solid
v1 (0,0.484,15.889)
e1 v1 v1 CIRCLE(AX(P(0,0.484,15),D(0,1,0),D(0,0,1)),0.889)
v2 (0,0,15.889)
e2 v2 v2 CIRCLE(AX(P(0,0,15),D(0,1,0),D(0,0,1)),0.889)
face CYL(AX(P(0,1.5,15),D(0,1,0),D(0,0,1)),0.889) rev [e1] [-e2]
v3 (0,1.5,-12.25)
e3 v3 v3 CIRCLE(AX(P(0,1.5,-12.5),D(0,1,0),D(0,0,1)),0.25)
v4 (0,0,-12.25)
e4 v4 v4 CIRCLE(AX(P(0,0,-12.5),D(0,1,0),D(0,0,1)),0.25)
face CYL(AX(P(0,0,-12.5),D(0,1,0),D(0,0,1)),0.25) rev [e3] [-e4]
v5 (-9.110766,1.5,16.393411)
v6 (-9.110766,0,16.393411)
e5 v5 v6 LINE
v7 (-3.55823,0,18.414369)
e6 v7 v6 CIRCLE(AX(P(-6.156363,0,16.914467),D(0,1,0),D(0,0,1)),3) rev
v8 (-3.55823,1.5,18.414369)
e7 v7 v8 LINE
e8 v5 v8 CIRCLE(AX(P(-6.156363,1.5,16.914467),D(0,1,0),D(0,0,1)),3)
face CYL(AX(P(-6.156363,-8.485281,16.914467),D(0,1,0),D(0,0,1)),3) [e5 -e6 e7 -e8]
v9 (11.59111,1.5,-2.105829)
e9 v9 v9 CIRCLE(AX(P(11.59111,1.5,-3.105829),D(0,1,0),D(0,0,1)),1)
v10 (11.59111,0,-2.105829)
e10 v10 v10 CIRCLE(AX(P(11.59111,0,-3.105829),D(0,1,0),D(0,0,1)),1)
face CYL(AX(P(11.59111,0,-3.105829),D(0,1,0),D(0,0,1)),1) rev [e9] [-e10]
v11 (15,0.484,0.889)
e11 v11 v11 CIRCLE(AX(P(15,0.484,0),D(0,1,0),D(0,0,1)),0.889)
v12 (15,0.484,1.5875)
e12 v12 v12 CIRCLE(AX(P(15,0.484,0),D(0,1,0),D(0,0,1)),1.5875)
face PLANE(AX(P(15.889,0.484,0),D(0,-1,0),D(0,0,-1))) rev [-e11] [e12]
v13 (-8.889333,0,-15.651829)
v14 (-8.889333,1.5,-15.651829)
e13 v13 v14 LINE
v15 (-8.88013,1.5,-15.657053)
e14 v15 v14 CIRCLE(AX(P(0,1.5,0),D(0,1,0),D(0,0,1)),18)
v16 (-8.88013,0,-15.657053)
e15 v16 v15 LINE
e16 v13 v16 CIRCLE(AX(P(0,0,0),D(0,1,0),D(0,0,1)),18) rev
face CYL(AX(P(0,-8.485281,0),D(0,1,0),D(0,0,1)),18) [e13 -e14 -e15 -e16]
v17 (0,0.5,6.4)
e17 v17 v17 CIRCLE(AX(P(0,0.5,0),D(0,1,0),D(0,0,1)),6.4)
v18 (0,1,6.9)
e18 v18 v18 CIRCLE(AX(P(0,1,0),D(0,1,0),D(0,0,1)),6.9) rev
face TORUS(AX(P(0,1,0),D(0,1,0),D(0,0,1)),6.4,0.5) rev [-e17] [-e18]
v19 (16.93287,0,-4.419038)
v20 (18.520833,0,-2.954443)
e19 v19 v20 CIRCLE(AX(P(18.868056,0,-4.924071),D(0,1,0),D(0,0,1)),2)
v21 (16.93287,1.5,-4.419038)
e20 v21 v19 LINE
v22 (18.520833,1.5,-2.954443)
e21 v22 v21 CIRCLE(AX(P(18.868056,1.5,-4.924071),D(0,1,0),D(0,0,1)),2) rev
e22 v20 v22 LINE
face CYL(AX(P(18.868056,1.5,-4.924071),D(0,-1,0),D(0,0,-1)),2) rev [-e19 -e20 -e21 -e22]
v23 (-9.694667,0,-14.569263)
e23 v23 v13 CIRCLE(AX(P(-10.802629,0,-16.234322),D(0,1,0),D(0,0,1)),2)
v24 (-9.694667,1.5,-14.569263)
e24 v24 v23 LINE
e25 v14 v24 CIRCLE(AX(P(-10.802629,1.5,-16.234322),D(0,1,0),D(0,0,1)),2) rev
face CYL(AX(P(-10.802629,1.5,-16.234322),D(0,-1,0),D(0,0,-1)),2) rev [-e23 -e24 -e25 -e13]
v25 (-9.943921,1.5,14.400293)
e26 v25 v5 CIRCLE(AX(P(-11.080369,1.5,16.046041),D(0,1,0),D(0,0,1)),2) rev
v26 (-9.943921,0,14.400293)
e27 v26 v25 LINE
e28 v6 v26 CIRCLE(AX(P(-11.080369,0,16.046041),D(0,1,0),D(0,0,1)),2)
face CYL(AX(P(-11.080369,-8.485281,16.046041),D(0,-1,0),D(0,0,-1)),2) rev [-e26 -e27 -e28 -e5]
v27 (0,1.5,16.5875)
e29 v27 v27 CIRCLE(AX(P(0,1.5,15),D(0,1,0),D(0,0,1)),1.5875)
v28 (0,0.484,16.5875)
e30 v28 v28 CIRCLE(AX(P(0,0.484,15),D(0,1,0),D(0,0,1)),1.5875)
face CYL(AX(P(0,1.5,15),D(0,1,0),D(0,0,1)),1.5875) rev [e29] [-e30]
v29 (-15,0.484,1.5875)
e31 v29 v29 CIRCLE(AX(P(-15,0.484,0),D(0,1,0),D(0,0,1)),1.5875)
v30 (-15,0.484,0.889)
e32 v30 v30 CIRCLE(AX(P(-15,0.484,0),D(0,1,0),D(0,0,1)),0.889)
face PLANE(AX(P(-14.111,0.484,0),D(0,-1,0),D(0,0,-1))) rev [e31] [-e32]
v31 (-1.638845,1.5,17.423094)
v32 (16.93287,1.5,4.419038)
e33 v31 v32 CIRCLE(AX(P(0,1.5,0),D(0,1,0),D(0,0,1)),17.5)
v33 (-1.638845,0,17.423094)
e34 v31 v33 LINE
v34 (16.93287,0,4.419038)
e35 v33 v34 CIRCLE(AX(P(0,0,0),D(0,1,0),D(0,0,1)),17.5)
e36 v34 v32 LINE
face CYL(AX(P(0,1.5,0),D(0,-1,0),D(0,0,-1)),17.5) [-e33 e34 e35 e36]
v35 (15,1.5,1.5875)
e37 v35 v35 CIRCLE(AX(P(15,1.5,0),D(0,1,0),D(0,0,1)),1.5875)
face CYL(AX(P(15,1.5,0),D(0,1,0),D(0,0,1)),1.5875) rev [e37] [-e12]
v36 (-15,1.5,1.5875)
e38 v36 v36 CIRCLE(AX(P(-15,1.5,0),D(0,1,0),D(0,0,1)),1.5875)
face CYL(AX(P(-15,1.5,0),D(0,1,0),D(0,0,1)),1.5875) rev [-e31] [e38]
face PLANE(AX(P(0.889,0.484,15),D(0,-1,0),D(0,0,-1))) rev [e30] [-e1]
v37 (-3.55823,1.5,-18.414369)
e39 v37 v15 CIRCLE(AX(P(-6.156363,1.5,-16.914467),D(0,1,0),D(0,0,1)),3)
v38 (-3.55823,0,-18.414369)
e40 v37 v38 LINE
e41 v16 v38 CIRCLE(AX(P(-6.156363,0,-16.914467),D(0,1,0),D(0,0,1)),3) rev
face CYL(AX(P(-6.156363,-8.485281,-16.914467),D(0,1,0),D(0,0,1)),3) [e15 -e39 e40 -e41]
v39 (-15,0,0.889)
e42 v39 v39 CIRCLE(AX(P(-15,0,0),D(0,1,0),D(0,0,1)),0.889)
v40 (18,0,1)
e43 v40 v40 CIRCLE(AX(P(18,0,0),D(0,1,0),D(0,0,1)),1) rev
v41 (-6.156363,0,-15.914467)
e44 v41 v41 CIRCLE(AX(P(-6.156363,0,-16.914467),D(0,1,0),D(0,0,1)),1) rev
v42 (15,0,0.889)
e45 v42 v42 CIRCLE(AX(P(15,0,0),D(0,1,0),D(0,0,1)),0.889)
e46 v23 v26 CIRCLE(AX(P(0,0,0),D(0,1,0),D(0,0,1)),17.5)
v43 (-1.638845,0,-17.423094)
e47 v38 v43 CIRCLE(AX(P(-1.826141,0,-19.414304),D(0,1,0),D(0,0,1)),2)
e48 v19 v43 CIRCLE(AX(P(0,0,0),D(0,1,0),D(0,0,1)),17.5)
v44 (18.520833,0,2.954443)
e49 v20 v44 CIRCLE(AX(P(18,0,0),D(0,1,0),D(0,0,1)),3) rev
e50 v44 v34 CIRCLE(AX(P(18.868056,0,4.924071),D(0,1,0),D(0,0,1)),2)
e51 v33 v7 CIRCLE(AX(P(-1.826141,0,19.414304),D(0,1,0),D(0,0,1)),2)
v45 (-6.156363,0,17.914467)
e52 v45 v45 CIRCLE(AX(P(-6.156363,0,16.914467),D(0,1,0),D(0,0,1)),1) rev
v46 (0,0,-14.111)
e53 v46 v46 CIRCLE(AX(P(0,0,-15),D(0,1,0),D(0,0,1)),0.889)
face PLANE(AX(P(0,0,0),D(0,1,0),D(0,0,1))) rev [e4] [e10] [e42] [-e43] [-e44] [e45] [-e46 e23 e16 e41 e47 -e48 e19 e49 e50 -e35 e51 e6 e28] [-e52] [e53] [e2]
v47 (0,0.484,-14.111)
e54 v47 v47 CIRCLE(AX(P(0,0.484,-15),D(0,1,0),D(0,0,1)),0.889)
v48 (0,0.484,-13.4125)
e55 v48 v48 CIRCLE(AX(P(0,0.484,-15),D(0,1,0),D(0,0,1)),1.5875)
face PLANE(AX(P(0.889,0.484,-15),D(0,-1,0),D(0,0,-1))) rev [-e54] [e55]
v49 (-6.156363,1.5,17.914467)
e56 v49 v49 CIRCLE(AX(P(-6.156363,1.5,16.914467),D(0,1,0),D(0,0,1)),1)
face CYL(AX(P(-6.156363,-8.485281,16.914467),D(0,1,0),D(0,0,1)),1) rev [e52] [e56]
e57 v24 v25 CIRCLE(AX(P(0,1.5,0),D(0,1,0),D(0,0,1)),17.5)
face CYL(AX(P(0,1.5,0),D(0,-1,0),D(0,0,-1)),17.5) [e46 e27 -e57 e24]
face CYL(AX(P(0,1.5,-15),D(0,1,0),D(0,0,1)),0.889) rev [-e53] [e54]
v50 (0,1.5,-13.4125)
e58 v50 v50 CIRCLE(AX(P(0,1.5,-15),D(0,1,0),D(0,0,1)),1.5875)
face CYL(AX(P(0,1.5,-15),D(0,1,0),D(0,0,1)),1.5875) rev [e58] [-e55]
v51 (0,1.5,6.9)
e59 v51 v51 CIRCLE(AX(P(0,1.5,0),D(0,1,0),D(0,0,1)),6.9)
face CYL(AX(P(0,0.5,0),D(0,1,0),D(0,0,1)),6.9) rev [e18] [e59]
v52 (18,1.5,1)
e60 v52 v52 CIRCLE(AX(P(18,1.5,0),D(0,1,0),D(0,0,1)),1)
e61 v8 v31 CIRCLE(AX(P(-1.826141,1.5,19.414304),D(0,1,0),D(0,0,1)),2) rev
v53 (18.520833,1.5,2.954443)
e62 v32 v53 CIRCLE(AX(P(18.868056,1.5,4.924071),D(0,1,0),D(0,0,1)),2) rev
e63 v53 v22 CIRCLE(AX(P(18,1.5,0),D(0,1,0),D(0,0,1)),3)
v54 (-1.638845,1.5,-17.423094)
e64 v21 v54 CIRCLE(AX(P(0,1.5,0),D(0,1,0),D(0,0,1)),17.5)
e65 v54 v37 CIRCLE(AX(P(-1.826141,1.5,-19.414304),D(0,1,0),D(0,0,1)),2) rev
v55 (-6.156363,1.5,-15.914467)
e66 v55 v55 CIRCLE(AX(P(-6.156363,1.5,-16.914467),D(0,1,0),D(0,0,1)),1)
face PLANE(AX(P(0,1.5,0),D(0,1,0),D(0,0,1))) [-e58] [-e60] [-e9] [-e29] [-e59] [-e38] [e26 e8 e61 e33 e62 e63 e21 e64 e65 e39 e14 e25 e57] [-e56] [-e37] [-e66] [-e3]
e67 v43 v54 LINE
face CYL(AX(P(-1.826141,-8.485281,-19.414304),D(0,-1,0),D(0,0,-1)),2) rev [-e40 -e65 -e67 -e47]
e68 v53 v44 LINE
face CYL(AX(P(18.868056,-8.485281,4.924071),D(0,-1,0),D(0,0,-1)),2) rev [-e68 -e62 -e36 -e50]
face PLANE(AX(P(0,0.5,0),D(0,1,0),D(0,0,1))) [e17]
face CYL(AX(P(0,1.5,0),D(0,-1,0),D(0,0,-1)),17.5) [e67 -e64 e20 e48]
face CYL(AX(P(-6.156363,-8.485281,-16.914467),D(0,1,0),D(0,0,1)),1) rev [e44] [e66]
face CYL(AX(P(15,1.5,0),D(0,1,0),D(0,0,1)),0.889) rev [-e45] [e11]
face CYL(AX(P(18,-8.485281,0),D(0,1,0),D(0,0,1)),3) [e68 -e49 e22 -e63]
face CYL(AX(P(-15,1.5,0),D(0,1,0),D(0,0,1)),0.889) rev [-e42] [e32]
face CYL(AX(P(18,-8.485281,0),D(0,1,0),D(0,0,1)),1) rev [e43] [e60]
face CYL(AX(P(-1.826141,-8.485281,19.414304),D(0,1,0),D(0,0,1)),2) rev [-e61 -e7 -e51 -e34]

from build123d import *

# Parameters (mm, degrees)
SKETCH1_R                                      = 17.5
BOSS_EXTRUDE1_DEPTH                            = 1.5
CUT_EXTRUDE1_DEPTH                             = 25.794152536
CUT_EXTRUDE1_DEPTH_BACK                        = 25.794152536
SKETCH6_R                                      = 0.25
SKETCH6_R_2                                    = 1
CBORE_FOR_0_SOCKET_HEAD_CAP_SCREW1_D           = 1.778
CBORE_FOR_0_SOCKET_HEAD_CAP_SCREW1_CBORE_D     = 3.175
CBORE_FOR_0_SOCKET_HEAD_CAP_SCREW1_CBORE_DEPTH = 1.016
BOSS_EXTRUDE2_START                            = -1.5
BOSS_EXTRUDE2_DEPTH                            = 1.5
FILLET1_DEPTH                                  = 1.5
CUT_EXTRUDE2_START                             = -10
SKETCH16_R                                     = 1
CUT_EXTRUDE2_DEPTH                             = 10
SKETCH17_R                                     = 6.9
CUT_EXTRUDE3_DEPTH                             = 1
FILLET2_R                                      = 0.5


with BuildPart() as part:
    # Sketch1 → Boss-Extrude1 (new body)
    with BuildSketch(Plane(origin=(0, 0, 0), x_dir=(1, 0, 0), z_dir=(0, 1, 0))):
        with Locations(Location((0, 0, 0), (0, 0, 270))):
            Circle(SKETCH1_R)
    extrude(amount=BOSS_EXTRUDE1_DEPTH)

    # Sketch6 → Cut-Extrude1 (cut, two sides: drawn at the far end of the back side and taken through both)
    with BuildSketch(Plane(origin=(0, 1.5, 0), x_dir=(1, 0, 0), z_dir=(0, 1, 0)).offset(-CUT_EXTRUDE1_DEPTH_BACK)):
        with Locations(Location((0, 12.5, 0), (0, 0, 270))):
            Circle(SKETCH6_R)
        with Locations(Location((11.591109915, 3.105828541, 0), (0, 0, 270))):
            Circle(SKETCH6_R_2)
    extrude(amount=CUT_EXTRUDE1_DEPTH + CUT_EXTRUDE1_DEPTH_BACK, mode=Mode.SUBTRACT)

    # CBORE for #0 Socket Head Cap Screw1 (through all)
    with Locations(Plane(origin=(0, 1.5, 0), x_dir=(1, 0, 0), z_dir=(0, 1, 0))):
        with Locations((0, 15), (-15, 0), (0, -15), (15, 0)):
            CounterBoreHole(CBORE_FOR_0_SOCKET_HEAD_CAP_SCREW1_D / 2, CBORE_FOR_0_SOCKET_HEAD_CAP_SCREW1_CBORE_D / 2, CBORE_FOR_0_SOCKET_HEAD_CAP_SCREW1_CBORE_DEPTH)

    # Sketch15 → Boss-Extrude2 (add)
    # profile 1 of 3: a face of its own
    with BuildSketch(Plane(origin=(0, 1.5, 0), x_dir=(1, 0, 0), z_dir=(0, 1, 0)).offset(BOSS_EXTRUDE2_START)):
        with BuildLine():
            ThreePointArc((-5.176050603, 16.717012297), (-4.139884011, 17.00327499), (-3.0880962, 17.225378424))
            Line((-3.0880962, 17.225378424), (-3.2615852, 17.702035532))
            ThreePointArc((-3.2615852, 17.702035532), (-7.18242301, 19.733545037), (-8.880129888, 15.657052506))
            ThreePointArc((-8.880129888, 15.657052506), (-8.884731942, 15.654441488), (-8.889333228, 15.651829119))
            Line((-8.889333228, 15.651829119), (-8.715826512, 15.175123334))
            ThreePointArc((-8.715826512, 15.175123334), (-7.762905696, 15.68398212), (-6.780403574, 16.133075571))
            ThreePointArc((-6.780403574, 16.133075571), (-6.498382723, 17.854159795), (-5.176050603, 16.717012297))
        make_face()
    # profile 2 of 3: a face of its own
    with BuildSketch(Plane(origin=(0, 1.5, 0), x_dir=(1, 0, 0), z_dir=(0, 1, 0)).offset(BOSS_EXTRUDE2_START)):
        with BuildLine():
            ThreePointArc((17.242700391, 2.989863415), (17.499999999, 0.00015134), (17.242752101, -2.989565186))
            Line((17.242752101, -2.989565186), (17.75, -2.989565186))
            ThreePointArc((17.75, -2.989565186), (21, 0), (17.75, 2.989565186))
            Line((17.75, 2.989565186), (17.242700391, 2.989863415))
        make_face()
        with BuildLine():
            ThreePointArc((17.972222222, 0.999614123), (19, 0), (17.972222222, -0.999614123))
            ThreePointArc((17.972222222, -0.999614123), (18, 0), (17.972222222, 0.999614123))
        make_face(mode=Mode.SUBTRACT)
    # profile 3 of 3: a face of its own
    with BuildSketch(Plane(origin=(0, 1.5, 0), x_dir=(1, 0, 0), z_dir=(0, 1, 0)).offset(BOSS_EXTRUDE2_START)):
        with BuildLine():
            ThreePointArc((-8.880129888, -15.657052506), (-6.943930938, -19.809244554), (-3.170985611, -17.210312323))
            ThreePointArc((-3.170985611, -17.210312323), (-4.180800117, -16.993260734), (-5.176050603, -16.717012297))
            ThreePointArc((-5.176050603, -16.717012297), (-6.498382723, -17.854159795), (-6.780403574, -16.133075571))
            ThreePointArc((-6.780403574, -16.133075571), (-7.758295007, -15.686263372), (-8.706903461, -15.180244798))
            Line((-8.706903461, -15.180244798), (-8.880129888, -15.657052506))
        make_face()
    extrude(amount=BOSS_EXTRUDE2_DEPTH)

    # Fillet1: read off the stored shape, not the designer's step
    # Fillet1 outline → Fillet1 (add)
    with BuildSketch(Plane(origin=(0, 0, 0), x_dir=(1, 0, 0), z_dir=(0, 1, 0))):
        with BuildLine():
            ThreePointArc((-8.889333228, 15.651829119), (-9.197952649, 15.040582781), (-9.694667487, 14.56926293))
            ThreePointArc((-9.694667487, 14.56926293), (-9.210230129, 14.880243982), (-8.715826512, 15.175123334))
            Line((-8.715826512, 15.175123334), (-8.889333228, 15.651829119))
        make_face()
        with BuildLine():
            ThreePointArc((-9.943920594, -14.400293164), (-9.235099699, -15.274689897), (-9.110766229, -16.393411442))
            ThreePointArc((-9.110766229, -16.393411442), (-9.019221723, -16.017785781), (-8.880129888, -15.657052506))
            Line((-8.880129888, -15.657052506), (-8.706903461, -15.180244798))
            ThreePointArc((-8.706903461, -15.180244798), (-9.33356259, -14.803195918), (-9.943920594, -14.400293164))
        make_face()
        with BuildLine():
            ThreePointArc((-3.0880962, 17.225378424), (-2.365537121, 17.339383902), (-1.638844908, 17.423093507))
            ThreePointArc((-1.638844908, 17.423093507), (-2.743884601, 17.637298977), (-3.558229913, 18.414369386))
            ThreePointArc((-3.558229913, 18.414369386), (-3.386909552, 18.067779761), (-3.2615852, 17.702035532))
            Line((-3.2615852, 17.702035532), (-3.0880962, 17.225378424))
        make_face()
        with BuildLine():
            ThreePointArc((17.75, 2.989565186), (18.136550606, 2.996890711), (18.520833333, 2.954442865))
            ThreePointArc((18.520833333, 2.954442865), (17.512103504, 3.453903412), (16.93287037, 4.419038472))
            ThreePointArc((16.93287037, 4.419038472), (17.102720385, 3.707688694), (17.242700391, 2.989863415))
            Line((17.242700391, 2.989863415), (17.75, 2.989565186))
        make_face()
        with BuildLine():
            ThreePointArc((17.242752101, -2.989565186), (17.102752448, -3.70754079), (16.932870371, -4.419038472))
            ThreePointArc((16.932870371, -4.419038472), (17.512103504, -3.453903412), (18.520833333, -2.954442864))
            ThreePointArc((18.520833333, -2.954442864), (18.136550606, -2.996890711), (17.75, -2.989565186))
            Line((17.75, -2.989565186), (17.242752101, -2.989565186))
        make_face()
        with BuildLine():
            ThreePointArc((-3.558229913, -18.414369386), (-2.743884601, -17.637298977), (-1.638844908, -17.423093507))
            ThreePointArc((-1.638844908, -17.423093507), (-2.407267406, -17.333639653), (-3.170985611, -17.210312323))
            ThreePointArc((-3.170985611, -17.210312323), (-3.300433079, -17.832980475), (-3.558229913, -18.414369386))
        make_face()
    extrude(amount=FILLET1_DEPTH)

    # Sketch16 → Cut-Extrude2 (cut)
    with BuildSketch(Plane(origin=(0, 1.5, 0), x_dir=(1, 0, 0), z_dir=(0, 1, 0)).offset(CUT_EXTRUDE2_START)):
        with Locations(Location((-6.15636258, 16.914467174, 0), (0, 0, 270))):
            Circle(SKETCH16_R)
        with Locations(Location((18, 0, 0), (0, 0, 270))):
            Circle(SKETCH16_R)
        with Locations(Location((-6.15636258, -16.914467174, 0), (0, 0, 270))):
            Circle(SKETCH16_R)
    extrude(amount=CUT_EXTRUDE2_DEPTH, mode=Mode.SUBTRACT)

    # Sketch17 → Cut-Extrude3 (cut)
    with BuildSketch(Plane(origin=(0, 1.5, 0), x_dir=(1, 0, 0), z_dir=(0, 1, 0))):
        with Locations(Location((0, 0, 0), (0, 0, 270))):
            Circle(SKETCH17_R)
    extrude(amount=-CUT_EXTRUDE3_DEPTH, mode=Mode.SUBTRACT)

    # Fillet2
    fillet2_edges = [part.edges().sort_by_distance(p)[0] for p in [
        (0, 0.5, -6.9),
    ]]
    fillet(fillet2_edges, radius=FILLET2_R)


solid = part.part
